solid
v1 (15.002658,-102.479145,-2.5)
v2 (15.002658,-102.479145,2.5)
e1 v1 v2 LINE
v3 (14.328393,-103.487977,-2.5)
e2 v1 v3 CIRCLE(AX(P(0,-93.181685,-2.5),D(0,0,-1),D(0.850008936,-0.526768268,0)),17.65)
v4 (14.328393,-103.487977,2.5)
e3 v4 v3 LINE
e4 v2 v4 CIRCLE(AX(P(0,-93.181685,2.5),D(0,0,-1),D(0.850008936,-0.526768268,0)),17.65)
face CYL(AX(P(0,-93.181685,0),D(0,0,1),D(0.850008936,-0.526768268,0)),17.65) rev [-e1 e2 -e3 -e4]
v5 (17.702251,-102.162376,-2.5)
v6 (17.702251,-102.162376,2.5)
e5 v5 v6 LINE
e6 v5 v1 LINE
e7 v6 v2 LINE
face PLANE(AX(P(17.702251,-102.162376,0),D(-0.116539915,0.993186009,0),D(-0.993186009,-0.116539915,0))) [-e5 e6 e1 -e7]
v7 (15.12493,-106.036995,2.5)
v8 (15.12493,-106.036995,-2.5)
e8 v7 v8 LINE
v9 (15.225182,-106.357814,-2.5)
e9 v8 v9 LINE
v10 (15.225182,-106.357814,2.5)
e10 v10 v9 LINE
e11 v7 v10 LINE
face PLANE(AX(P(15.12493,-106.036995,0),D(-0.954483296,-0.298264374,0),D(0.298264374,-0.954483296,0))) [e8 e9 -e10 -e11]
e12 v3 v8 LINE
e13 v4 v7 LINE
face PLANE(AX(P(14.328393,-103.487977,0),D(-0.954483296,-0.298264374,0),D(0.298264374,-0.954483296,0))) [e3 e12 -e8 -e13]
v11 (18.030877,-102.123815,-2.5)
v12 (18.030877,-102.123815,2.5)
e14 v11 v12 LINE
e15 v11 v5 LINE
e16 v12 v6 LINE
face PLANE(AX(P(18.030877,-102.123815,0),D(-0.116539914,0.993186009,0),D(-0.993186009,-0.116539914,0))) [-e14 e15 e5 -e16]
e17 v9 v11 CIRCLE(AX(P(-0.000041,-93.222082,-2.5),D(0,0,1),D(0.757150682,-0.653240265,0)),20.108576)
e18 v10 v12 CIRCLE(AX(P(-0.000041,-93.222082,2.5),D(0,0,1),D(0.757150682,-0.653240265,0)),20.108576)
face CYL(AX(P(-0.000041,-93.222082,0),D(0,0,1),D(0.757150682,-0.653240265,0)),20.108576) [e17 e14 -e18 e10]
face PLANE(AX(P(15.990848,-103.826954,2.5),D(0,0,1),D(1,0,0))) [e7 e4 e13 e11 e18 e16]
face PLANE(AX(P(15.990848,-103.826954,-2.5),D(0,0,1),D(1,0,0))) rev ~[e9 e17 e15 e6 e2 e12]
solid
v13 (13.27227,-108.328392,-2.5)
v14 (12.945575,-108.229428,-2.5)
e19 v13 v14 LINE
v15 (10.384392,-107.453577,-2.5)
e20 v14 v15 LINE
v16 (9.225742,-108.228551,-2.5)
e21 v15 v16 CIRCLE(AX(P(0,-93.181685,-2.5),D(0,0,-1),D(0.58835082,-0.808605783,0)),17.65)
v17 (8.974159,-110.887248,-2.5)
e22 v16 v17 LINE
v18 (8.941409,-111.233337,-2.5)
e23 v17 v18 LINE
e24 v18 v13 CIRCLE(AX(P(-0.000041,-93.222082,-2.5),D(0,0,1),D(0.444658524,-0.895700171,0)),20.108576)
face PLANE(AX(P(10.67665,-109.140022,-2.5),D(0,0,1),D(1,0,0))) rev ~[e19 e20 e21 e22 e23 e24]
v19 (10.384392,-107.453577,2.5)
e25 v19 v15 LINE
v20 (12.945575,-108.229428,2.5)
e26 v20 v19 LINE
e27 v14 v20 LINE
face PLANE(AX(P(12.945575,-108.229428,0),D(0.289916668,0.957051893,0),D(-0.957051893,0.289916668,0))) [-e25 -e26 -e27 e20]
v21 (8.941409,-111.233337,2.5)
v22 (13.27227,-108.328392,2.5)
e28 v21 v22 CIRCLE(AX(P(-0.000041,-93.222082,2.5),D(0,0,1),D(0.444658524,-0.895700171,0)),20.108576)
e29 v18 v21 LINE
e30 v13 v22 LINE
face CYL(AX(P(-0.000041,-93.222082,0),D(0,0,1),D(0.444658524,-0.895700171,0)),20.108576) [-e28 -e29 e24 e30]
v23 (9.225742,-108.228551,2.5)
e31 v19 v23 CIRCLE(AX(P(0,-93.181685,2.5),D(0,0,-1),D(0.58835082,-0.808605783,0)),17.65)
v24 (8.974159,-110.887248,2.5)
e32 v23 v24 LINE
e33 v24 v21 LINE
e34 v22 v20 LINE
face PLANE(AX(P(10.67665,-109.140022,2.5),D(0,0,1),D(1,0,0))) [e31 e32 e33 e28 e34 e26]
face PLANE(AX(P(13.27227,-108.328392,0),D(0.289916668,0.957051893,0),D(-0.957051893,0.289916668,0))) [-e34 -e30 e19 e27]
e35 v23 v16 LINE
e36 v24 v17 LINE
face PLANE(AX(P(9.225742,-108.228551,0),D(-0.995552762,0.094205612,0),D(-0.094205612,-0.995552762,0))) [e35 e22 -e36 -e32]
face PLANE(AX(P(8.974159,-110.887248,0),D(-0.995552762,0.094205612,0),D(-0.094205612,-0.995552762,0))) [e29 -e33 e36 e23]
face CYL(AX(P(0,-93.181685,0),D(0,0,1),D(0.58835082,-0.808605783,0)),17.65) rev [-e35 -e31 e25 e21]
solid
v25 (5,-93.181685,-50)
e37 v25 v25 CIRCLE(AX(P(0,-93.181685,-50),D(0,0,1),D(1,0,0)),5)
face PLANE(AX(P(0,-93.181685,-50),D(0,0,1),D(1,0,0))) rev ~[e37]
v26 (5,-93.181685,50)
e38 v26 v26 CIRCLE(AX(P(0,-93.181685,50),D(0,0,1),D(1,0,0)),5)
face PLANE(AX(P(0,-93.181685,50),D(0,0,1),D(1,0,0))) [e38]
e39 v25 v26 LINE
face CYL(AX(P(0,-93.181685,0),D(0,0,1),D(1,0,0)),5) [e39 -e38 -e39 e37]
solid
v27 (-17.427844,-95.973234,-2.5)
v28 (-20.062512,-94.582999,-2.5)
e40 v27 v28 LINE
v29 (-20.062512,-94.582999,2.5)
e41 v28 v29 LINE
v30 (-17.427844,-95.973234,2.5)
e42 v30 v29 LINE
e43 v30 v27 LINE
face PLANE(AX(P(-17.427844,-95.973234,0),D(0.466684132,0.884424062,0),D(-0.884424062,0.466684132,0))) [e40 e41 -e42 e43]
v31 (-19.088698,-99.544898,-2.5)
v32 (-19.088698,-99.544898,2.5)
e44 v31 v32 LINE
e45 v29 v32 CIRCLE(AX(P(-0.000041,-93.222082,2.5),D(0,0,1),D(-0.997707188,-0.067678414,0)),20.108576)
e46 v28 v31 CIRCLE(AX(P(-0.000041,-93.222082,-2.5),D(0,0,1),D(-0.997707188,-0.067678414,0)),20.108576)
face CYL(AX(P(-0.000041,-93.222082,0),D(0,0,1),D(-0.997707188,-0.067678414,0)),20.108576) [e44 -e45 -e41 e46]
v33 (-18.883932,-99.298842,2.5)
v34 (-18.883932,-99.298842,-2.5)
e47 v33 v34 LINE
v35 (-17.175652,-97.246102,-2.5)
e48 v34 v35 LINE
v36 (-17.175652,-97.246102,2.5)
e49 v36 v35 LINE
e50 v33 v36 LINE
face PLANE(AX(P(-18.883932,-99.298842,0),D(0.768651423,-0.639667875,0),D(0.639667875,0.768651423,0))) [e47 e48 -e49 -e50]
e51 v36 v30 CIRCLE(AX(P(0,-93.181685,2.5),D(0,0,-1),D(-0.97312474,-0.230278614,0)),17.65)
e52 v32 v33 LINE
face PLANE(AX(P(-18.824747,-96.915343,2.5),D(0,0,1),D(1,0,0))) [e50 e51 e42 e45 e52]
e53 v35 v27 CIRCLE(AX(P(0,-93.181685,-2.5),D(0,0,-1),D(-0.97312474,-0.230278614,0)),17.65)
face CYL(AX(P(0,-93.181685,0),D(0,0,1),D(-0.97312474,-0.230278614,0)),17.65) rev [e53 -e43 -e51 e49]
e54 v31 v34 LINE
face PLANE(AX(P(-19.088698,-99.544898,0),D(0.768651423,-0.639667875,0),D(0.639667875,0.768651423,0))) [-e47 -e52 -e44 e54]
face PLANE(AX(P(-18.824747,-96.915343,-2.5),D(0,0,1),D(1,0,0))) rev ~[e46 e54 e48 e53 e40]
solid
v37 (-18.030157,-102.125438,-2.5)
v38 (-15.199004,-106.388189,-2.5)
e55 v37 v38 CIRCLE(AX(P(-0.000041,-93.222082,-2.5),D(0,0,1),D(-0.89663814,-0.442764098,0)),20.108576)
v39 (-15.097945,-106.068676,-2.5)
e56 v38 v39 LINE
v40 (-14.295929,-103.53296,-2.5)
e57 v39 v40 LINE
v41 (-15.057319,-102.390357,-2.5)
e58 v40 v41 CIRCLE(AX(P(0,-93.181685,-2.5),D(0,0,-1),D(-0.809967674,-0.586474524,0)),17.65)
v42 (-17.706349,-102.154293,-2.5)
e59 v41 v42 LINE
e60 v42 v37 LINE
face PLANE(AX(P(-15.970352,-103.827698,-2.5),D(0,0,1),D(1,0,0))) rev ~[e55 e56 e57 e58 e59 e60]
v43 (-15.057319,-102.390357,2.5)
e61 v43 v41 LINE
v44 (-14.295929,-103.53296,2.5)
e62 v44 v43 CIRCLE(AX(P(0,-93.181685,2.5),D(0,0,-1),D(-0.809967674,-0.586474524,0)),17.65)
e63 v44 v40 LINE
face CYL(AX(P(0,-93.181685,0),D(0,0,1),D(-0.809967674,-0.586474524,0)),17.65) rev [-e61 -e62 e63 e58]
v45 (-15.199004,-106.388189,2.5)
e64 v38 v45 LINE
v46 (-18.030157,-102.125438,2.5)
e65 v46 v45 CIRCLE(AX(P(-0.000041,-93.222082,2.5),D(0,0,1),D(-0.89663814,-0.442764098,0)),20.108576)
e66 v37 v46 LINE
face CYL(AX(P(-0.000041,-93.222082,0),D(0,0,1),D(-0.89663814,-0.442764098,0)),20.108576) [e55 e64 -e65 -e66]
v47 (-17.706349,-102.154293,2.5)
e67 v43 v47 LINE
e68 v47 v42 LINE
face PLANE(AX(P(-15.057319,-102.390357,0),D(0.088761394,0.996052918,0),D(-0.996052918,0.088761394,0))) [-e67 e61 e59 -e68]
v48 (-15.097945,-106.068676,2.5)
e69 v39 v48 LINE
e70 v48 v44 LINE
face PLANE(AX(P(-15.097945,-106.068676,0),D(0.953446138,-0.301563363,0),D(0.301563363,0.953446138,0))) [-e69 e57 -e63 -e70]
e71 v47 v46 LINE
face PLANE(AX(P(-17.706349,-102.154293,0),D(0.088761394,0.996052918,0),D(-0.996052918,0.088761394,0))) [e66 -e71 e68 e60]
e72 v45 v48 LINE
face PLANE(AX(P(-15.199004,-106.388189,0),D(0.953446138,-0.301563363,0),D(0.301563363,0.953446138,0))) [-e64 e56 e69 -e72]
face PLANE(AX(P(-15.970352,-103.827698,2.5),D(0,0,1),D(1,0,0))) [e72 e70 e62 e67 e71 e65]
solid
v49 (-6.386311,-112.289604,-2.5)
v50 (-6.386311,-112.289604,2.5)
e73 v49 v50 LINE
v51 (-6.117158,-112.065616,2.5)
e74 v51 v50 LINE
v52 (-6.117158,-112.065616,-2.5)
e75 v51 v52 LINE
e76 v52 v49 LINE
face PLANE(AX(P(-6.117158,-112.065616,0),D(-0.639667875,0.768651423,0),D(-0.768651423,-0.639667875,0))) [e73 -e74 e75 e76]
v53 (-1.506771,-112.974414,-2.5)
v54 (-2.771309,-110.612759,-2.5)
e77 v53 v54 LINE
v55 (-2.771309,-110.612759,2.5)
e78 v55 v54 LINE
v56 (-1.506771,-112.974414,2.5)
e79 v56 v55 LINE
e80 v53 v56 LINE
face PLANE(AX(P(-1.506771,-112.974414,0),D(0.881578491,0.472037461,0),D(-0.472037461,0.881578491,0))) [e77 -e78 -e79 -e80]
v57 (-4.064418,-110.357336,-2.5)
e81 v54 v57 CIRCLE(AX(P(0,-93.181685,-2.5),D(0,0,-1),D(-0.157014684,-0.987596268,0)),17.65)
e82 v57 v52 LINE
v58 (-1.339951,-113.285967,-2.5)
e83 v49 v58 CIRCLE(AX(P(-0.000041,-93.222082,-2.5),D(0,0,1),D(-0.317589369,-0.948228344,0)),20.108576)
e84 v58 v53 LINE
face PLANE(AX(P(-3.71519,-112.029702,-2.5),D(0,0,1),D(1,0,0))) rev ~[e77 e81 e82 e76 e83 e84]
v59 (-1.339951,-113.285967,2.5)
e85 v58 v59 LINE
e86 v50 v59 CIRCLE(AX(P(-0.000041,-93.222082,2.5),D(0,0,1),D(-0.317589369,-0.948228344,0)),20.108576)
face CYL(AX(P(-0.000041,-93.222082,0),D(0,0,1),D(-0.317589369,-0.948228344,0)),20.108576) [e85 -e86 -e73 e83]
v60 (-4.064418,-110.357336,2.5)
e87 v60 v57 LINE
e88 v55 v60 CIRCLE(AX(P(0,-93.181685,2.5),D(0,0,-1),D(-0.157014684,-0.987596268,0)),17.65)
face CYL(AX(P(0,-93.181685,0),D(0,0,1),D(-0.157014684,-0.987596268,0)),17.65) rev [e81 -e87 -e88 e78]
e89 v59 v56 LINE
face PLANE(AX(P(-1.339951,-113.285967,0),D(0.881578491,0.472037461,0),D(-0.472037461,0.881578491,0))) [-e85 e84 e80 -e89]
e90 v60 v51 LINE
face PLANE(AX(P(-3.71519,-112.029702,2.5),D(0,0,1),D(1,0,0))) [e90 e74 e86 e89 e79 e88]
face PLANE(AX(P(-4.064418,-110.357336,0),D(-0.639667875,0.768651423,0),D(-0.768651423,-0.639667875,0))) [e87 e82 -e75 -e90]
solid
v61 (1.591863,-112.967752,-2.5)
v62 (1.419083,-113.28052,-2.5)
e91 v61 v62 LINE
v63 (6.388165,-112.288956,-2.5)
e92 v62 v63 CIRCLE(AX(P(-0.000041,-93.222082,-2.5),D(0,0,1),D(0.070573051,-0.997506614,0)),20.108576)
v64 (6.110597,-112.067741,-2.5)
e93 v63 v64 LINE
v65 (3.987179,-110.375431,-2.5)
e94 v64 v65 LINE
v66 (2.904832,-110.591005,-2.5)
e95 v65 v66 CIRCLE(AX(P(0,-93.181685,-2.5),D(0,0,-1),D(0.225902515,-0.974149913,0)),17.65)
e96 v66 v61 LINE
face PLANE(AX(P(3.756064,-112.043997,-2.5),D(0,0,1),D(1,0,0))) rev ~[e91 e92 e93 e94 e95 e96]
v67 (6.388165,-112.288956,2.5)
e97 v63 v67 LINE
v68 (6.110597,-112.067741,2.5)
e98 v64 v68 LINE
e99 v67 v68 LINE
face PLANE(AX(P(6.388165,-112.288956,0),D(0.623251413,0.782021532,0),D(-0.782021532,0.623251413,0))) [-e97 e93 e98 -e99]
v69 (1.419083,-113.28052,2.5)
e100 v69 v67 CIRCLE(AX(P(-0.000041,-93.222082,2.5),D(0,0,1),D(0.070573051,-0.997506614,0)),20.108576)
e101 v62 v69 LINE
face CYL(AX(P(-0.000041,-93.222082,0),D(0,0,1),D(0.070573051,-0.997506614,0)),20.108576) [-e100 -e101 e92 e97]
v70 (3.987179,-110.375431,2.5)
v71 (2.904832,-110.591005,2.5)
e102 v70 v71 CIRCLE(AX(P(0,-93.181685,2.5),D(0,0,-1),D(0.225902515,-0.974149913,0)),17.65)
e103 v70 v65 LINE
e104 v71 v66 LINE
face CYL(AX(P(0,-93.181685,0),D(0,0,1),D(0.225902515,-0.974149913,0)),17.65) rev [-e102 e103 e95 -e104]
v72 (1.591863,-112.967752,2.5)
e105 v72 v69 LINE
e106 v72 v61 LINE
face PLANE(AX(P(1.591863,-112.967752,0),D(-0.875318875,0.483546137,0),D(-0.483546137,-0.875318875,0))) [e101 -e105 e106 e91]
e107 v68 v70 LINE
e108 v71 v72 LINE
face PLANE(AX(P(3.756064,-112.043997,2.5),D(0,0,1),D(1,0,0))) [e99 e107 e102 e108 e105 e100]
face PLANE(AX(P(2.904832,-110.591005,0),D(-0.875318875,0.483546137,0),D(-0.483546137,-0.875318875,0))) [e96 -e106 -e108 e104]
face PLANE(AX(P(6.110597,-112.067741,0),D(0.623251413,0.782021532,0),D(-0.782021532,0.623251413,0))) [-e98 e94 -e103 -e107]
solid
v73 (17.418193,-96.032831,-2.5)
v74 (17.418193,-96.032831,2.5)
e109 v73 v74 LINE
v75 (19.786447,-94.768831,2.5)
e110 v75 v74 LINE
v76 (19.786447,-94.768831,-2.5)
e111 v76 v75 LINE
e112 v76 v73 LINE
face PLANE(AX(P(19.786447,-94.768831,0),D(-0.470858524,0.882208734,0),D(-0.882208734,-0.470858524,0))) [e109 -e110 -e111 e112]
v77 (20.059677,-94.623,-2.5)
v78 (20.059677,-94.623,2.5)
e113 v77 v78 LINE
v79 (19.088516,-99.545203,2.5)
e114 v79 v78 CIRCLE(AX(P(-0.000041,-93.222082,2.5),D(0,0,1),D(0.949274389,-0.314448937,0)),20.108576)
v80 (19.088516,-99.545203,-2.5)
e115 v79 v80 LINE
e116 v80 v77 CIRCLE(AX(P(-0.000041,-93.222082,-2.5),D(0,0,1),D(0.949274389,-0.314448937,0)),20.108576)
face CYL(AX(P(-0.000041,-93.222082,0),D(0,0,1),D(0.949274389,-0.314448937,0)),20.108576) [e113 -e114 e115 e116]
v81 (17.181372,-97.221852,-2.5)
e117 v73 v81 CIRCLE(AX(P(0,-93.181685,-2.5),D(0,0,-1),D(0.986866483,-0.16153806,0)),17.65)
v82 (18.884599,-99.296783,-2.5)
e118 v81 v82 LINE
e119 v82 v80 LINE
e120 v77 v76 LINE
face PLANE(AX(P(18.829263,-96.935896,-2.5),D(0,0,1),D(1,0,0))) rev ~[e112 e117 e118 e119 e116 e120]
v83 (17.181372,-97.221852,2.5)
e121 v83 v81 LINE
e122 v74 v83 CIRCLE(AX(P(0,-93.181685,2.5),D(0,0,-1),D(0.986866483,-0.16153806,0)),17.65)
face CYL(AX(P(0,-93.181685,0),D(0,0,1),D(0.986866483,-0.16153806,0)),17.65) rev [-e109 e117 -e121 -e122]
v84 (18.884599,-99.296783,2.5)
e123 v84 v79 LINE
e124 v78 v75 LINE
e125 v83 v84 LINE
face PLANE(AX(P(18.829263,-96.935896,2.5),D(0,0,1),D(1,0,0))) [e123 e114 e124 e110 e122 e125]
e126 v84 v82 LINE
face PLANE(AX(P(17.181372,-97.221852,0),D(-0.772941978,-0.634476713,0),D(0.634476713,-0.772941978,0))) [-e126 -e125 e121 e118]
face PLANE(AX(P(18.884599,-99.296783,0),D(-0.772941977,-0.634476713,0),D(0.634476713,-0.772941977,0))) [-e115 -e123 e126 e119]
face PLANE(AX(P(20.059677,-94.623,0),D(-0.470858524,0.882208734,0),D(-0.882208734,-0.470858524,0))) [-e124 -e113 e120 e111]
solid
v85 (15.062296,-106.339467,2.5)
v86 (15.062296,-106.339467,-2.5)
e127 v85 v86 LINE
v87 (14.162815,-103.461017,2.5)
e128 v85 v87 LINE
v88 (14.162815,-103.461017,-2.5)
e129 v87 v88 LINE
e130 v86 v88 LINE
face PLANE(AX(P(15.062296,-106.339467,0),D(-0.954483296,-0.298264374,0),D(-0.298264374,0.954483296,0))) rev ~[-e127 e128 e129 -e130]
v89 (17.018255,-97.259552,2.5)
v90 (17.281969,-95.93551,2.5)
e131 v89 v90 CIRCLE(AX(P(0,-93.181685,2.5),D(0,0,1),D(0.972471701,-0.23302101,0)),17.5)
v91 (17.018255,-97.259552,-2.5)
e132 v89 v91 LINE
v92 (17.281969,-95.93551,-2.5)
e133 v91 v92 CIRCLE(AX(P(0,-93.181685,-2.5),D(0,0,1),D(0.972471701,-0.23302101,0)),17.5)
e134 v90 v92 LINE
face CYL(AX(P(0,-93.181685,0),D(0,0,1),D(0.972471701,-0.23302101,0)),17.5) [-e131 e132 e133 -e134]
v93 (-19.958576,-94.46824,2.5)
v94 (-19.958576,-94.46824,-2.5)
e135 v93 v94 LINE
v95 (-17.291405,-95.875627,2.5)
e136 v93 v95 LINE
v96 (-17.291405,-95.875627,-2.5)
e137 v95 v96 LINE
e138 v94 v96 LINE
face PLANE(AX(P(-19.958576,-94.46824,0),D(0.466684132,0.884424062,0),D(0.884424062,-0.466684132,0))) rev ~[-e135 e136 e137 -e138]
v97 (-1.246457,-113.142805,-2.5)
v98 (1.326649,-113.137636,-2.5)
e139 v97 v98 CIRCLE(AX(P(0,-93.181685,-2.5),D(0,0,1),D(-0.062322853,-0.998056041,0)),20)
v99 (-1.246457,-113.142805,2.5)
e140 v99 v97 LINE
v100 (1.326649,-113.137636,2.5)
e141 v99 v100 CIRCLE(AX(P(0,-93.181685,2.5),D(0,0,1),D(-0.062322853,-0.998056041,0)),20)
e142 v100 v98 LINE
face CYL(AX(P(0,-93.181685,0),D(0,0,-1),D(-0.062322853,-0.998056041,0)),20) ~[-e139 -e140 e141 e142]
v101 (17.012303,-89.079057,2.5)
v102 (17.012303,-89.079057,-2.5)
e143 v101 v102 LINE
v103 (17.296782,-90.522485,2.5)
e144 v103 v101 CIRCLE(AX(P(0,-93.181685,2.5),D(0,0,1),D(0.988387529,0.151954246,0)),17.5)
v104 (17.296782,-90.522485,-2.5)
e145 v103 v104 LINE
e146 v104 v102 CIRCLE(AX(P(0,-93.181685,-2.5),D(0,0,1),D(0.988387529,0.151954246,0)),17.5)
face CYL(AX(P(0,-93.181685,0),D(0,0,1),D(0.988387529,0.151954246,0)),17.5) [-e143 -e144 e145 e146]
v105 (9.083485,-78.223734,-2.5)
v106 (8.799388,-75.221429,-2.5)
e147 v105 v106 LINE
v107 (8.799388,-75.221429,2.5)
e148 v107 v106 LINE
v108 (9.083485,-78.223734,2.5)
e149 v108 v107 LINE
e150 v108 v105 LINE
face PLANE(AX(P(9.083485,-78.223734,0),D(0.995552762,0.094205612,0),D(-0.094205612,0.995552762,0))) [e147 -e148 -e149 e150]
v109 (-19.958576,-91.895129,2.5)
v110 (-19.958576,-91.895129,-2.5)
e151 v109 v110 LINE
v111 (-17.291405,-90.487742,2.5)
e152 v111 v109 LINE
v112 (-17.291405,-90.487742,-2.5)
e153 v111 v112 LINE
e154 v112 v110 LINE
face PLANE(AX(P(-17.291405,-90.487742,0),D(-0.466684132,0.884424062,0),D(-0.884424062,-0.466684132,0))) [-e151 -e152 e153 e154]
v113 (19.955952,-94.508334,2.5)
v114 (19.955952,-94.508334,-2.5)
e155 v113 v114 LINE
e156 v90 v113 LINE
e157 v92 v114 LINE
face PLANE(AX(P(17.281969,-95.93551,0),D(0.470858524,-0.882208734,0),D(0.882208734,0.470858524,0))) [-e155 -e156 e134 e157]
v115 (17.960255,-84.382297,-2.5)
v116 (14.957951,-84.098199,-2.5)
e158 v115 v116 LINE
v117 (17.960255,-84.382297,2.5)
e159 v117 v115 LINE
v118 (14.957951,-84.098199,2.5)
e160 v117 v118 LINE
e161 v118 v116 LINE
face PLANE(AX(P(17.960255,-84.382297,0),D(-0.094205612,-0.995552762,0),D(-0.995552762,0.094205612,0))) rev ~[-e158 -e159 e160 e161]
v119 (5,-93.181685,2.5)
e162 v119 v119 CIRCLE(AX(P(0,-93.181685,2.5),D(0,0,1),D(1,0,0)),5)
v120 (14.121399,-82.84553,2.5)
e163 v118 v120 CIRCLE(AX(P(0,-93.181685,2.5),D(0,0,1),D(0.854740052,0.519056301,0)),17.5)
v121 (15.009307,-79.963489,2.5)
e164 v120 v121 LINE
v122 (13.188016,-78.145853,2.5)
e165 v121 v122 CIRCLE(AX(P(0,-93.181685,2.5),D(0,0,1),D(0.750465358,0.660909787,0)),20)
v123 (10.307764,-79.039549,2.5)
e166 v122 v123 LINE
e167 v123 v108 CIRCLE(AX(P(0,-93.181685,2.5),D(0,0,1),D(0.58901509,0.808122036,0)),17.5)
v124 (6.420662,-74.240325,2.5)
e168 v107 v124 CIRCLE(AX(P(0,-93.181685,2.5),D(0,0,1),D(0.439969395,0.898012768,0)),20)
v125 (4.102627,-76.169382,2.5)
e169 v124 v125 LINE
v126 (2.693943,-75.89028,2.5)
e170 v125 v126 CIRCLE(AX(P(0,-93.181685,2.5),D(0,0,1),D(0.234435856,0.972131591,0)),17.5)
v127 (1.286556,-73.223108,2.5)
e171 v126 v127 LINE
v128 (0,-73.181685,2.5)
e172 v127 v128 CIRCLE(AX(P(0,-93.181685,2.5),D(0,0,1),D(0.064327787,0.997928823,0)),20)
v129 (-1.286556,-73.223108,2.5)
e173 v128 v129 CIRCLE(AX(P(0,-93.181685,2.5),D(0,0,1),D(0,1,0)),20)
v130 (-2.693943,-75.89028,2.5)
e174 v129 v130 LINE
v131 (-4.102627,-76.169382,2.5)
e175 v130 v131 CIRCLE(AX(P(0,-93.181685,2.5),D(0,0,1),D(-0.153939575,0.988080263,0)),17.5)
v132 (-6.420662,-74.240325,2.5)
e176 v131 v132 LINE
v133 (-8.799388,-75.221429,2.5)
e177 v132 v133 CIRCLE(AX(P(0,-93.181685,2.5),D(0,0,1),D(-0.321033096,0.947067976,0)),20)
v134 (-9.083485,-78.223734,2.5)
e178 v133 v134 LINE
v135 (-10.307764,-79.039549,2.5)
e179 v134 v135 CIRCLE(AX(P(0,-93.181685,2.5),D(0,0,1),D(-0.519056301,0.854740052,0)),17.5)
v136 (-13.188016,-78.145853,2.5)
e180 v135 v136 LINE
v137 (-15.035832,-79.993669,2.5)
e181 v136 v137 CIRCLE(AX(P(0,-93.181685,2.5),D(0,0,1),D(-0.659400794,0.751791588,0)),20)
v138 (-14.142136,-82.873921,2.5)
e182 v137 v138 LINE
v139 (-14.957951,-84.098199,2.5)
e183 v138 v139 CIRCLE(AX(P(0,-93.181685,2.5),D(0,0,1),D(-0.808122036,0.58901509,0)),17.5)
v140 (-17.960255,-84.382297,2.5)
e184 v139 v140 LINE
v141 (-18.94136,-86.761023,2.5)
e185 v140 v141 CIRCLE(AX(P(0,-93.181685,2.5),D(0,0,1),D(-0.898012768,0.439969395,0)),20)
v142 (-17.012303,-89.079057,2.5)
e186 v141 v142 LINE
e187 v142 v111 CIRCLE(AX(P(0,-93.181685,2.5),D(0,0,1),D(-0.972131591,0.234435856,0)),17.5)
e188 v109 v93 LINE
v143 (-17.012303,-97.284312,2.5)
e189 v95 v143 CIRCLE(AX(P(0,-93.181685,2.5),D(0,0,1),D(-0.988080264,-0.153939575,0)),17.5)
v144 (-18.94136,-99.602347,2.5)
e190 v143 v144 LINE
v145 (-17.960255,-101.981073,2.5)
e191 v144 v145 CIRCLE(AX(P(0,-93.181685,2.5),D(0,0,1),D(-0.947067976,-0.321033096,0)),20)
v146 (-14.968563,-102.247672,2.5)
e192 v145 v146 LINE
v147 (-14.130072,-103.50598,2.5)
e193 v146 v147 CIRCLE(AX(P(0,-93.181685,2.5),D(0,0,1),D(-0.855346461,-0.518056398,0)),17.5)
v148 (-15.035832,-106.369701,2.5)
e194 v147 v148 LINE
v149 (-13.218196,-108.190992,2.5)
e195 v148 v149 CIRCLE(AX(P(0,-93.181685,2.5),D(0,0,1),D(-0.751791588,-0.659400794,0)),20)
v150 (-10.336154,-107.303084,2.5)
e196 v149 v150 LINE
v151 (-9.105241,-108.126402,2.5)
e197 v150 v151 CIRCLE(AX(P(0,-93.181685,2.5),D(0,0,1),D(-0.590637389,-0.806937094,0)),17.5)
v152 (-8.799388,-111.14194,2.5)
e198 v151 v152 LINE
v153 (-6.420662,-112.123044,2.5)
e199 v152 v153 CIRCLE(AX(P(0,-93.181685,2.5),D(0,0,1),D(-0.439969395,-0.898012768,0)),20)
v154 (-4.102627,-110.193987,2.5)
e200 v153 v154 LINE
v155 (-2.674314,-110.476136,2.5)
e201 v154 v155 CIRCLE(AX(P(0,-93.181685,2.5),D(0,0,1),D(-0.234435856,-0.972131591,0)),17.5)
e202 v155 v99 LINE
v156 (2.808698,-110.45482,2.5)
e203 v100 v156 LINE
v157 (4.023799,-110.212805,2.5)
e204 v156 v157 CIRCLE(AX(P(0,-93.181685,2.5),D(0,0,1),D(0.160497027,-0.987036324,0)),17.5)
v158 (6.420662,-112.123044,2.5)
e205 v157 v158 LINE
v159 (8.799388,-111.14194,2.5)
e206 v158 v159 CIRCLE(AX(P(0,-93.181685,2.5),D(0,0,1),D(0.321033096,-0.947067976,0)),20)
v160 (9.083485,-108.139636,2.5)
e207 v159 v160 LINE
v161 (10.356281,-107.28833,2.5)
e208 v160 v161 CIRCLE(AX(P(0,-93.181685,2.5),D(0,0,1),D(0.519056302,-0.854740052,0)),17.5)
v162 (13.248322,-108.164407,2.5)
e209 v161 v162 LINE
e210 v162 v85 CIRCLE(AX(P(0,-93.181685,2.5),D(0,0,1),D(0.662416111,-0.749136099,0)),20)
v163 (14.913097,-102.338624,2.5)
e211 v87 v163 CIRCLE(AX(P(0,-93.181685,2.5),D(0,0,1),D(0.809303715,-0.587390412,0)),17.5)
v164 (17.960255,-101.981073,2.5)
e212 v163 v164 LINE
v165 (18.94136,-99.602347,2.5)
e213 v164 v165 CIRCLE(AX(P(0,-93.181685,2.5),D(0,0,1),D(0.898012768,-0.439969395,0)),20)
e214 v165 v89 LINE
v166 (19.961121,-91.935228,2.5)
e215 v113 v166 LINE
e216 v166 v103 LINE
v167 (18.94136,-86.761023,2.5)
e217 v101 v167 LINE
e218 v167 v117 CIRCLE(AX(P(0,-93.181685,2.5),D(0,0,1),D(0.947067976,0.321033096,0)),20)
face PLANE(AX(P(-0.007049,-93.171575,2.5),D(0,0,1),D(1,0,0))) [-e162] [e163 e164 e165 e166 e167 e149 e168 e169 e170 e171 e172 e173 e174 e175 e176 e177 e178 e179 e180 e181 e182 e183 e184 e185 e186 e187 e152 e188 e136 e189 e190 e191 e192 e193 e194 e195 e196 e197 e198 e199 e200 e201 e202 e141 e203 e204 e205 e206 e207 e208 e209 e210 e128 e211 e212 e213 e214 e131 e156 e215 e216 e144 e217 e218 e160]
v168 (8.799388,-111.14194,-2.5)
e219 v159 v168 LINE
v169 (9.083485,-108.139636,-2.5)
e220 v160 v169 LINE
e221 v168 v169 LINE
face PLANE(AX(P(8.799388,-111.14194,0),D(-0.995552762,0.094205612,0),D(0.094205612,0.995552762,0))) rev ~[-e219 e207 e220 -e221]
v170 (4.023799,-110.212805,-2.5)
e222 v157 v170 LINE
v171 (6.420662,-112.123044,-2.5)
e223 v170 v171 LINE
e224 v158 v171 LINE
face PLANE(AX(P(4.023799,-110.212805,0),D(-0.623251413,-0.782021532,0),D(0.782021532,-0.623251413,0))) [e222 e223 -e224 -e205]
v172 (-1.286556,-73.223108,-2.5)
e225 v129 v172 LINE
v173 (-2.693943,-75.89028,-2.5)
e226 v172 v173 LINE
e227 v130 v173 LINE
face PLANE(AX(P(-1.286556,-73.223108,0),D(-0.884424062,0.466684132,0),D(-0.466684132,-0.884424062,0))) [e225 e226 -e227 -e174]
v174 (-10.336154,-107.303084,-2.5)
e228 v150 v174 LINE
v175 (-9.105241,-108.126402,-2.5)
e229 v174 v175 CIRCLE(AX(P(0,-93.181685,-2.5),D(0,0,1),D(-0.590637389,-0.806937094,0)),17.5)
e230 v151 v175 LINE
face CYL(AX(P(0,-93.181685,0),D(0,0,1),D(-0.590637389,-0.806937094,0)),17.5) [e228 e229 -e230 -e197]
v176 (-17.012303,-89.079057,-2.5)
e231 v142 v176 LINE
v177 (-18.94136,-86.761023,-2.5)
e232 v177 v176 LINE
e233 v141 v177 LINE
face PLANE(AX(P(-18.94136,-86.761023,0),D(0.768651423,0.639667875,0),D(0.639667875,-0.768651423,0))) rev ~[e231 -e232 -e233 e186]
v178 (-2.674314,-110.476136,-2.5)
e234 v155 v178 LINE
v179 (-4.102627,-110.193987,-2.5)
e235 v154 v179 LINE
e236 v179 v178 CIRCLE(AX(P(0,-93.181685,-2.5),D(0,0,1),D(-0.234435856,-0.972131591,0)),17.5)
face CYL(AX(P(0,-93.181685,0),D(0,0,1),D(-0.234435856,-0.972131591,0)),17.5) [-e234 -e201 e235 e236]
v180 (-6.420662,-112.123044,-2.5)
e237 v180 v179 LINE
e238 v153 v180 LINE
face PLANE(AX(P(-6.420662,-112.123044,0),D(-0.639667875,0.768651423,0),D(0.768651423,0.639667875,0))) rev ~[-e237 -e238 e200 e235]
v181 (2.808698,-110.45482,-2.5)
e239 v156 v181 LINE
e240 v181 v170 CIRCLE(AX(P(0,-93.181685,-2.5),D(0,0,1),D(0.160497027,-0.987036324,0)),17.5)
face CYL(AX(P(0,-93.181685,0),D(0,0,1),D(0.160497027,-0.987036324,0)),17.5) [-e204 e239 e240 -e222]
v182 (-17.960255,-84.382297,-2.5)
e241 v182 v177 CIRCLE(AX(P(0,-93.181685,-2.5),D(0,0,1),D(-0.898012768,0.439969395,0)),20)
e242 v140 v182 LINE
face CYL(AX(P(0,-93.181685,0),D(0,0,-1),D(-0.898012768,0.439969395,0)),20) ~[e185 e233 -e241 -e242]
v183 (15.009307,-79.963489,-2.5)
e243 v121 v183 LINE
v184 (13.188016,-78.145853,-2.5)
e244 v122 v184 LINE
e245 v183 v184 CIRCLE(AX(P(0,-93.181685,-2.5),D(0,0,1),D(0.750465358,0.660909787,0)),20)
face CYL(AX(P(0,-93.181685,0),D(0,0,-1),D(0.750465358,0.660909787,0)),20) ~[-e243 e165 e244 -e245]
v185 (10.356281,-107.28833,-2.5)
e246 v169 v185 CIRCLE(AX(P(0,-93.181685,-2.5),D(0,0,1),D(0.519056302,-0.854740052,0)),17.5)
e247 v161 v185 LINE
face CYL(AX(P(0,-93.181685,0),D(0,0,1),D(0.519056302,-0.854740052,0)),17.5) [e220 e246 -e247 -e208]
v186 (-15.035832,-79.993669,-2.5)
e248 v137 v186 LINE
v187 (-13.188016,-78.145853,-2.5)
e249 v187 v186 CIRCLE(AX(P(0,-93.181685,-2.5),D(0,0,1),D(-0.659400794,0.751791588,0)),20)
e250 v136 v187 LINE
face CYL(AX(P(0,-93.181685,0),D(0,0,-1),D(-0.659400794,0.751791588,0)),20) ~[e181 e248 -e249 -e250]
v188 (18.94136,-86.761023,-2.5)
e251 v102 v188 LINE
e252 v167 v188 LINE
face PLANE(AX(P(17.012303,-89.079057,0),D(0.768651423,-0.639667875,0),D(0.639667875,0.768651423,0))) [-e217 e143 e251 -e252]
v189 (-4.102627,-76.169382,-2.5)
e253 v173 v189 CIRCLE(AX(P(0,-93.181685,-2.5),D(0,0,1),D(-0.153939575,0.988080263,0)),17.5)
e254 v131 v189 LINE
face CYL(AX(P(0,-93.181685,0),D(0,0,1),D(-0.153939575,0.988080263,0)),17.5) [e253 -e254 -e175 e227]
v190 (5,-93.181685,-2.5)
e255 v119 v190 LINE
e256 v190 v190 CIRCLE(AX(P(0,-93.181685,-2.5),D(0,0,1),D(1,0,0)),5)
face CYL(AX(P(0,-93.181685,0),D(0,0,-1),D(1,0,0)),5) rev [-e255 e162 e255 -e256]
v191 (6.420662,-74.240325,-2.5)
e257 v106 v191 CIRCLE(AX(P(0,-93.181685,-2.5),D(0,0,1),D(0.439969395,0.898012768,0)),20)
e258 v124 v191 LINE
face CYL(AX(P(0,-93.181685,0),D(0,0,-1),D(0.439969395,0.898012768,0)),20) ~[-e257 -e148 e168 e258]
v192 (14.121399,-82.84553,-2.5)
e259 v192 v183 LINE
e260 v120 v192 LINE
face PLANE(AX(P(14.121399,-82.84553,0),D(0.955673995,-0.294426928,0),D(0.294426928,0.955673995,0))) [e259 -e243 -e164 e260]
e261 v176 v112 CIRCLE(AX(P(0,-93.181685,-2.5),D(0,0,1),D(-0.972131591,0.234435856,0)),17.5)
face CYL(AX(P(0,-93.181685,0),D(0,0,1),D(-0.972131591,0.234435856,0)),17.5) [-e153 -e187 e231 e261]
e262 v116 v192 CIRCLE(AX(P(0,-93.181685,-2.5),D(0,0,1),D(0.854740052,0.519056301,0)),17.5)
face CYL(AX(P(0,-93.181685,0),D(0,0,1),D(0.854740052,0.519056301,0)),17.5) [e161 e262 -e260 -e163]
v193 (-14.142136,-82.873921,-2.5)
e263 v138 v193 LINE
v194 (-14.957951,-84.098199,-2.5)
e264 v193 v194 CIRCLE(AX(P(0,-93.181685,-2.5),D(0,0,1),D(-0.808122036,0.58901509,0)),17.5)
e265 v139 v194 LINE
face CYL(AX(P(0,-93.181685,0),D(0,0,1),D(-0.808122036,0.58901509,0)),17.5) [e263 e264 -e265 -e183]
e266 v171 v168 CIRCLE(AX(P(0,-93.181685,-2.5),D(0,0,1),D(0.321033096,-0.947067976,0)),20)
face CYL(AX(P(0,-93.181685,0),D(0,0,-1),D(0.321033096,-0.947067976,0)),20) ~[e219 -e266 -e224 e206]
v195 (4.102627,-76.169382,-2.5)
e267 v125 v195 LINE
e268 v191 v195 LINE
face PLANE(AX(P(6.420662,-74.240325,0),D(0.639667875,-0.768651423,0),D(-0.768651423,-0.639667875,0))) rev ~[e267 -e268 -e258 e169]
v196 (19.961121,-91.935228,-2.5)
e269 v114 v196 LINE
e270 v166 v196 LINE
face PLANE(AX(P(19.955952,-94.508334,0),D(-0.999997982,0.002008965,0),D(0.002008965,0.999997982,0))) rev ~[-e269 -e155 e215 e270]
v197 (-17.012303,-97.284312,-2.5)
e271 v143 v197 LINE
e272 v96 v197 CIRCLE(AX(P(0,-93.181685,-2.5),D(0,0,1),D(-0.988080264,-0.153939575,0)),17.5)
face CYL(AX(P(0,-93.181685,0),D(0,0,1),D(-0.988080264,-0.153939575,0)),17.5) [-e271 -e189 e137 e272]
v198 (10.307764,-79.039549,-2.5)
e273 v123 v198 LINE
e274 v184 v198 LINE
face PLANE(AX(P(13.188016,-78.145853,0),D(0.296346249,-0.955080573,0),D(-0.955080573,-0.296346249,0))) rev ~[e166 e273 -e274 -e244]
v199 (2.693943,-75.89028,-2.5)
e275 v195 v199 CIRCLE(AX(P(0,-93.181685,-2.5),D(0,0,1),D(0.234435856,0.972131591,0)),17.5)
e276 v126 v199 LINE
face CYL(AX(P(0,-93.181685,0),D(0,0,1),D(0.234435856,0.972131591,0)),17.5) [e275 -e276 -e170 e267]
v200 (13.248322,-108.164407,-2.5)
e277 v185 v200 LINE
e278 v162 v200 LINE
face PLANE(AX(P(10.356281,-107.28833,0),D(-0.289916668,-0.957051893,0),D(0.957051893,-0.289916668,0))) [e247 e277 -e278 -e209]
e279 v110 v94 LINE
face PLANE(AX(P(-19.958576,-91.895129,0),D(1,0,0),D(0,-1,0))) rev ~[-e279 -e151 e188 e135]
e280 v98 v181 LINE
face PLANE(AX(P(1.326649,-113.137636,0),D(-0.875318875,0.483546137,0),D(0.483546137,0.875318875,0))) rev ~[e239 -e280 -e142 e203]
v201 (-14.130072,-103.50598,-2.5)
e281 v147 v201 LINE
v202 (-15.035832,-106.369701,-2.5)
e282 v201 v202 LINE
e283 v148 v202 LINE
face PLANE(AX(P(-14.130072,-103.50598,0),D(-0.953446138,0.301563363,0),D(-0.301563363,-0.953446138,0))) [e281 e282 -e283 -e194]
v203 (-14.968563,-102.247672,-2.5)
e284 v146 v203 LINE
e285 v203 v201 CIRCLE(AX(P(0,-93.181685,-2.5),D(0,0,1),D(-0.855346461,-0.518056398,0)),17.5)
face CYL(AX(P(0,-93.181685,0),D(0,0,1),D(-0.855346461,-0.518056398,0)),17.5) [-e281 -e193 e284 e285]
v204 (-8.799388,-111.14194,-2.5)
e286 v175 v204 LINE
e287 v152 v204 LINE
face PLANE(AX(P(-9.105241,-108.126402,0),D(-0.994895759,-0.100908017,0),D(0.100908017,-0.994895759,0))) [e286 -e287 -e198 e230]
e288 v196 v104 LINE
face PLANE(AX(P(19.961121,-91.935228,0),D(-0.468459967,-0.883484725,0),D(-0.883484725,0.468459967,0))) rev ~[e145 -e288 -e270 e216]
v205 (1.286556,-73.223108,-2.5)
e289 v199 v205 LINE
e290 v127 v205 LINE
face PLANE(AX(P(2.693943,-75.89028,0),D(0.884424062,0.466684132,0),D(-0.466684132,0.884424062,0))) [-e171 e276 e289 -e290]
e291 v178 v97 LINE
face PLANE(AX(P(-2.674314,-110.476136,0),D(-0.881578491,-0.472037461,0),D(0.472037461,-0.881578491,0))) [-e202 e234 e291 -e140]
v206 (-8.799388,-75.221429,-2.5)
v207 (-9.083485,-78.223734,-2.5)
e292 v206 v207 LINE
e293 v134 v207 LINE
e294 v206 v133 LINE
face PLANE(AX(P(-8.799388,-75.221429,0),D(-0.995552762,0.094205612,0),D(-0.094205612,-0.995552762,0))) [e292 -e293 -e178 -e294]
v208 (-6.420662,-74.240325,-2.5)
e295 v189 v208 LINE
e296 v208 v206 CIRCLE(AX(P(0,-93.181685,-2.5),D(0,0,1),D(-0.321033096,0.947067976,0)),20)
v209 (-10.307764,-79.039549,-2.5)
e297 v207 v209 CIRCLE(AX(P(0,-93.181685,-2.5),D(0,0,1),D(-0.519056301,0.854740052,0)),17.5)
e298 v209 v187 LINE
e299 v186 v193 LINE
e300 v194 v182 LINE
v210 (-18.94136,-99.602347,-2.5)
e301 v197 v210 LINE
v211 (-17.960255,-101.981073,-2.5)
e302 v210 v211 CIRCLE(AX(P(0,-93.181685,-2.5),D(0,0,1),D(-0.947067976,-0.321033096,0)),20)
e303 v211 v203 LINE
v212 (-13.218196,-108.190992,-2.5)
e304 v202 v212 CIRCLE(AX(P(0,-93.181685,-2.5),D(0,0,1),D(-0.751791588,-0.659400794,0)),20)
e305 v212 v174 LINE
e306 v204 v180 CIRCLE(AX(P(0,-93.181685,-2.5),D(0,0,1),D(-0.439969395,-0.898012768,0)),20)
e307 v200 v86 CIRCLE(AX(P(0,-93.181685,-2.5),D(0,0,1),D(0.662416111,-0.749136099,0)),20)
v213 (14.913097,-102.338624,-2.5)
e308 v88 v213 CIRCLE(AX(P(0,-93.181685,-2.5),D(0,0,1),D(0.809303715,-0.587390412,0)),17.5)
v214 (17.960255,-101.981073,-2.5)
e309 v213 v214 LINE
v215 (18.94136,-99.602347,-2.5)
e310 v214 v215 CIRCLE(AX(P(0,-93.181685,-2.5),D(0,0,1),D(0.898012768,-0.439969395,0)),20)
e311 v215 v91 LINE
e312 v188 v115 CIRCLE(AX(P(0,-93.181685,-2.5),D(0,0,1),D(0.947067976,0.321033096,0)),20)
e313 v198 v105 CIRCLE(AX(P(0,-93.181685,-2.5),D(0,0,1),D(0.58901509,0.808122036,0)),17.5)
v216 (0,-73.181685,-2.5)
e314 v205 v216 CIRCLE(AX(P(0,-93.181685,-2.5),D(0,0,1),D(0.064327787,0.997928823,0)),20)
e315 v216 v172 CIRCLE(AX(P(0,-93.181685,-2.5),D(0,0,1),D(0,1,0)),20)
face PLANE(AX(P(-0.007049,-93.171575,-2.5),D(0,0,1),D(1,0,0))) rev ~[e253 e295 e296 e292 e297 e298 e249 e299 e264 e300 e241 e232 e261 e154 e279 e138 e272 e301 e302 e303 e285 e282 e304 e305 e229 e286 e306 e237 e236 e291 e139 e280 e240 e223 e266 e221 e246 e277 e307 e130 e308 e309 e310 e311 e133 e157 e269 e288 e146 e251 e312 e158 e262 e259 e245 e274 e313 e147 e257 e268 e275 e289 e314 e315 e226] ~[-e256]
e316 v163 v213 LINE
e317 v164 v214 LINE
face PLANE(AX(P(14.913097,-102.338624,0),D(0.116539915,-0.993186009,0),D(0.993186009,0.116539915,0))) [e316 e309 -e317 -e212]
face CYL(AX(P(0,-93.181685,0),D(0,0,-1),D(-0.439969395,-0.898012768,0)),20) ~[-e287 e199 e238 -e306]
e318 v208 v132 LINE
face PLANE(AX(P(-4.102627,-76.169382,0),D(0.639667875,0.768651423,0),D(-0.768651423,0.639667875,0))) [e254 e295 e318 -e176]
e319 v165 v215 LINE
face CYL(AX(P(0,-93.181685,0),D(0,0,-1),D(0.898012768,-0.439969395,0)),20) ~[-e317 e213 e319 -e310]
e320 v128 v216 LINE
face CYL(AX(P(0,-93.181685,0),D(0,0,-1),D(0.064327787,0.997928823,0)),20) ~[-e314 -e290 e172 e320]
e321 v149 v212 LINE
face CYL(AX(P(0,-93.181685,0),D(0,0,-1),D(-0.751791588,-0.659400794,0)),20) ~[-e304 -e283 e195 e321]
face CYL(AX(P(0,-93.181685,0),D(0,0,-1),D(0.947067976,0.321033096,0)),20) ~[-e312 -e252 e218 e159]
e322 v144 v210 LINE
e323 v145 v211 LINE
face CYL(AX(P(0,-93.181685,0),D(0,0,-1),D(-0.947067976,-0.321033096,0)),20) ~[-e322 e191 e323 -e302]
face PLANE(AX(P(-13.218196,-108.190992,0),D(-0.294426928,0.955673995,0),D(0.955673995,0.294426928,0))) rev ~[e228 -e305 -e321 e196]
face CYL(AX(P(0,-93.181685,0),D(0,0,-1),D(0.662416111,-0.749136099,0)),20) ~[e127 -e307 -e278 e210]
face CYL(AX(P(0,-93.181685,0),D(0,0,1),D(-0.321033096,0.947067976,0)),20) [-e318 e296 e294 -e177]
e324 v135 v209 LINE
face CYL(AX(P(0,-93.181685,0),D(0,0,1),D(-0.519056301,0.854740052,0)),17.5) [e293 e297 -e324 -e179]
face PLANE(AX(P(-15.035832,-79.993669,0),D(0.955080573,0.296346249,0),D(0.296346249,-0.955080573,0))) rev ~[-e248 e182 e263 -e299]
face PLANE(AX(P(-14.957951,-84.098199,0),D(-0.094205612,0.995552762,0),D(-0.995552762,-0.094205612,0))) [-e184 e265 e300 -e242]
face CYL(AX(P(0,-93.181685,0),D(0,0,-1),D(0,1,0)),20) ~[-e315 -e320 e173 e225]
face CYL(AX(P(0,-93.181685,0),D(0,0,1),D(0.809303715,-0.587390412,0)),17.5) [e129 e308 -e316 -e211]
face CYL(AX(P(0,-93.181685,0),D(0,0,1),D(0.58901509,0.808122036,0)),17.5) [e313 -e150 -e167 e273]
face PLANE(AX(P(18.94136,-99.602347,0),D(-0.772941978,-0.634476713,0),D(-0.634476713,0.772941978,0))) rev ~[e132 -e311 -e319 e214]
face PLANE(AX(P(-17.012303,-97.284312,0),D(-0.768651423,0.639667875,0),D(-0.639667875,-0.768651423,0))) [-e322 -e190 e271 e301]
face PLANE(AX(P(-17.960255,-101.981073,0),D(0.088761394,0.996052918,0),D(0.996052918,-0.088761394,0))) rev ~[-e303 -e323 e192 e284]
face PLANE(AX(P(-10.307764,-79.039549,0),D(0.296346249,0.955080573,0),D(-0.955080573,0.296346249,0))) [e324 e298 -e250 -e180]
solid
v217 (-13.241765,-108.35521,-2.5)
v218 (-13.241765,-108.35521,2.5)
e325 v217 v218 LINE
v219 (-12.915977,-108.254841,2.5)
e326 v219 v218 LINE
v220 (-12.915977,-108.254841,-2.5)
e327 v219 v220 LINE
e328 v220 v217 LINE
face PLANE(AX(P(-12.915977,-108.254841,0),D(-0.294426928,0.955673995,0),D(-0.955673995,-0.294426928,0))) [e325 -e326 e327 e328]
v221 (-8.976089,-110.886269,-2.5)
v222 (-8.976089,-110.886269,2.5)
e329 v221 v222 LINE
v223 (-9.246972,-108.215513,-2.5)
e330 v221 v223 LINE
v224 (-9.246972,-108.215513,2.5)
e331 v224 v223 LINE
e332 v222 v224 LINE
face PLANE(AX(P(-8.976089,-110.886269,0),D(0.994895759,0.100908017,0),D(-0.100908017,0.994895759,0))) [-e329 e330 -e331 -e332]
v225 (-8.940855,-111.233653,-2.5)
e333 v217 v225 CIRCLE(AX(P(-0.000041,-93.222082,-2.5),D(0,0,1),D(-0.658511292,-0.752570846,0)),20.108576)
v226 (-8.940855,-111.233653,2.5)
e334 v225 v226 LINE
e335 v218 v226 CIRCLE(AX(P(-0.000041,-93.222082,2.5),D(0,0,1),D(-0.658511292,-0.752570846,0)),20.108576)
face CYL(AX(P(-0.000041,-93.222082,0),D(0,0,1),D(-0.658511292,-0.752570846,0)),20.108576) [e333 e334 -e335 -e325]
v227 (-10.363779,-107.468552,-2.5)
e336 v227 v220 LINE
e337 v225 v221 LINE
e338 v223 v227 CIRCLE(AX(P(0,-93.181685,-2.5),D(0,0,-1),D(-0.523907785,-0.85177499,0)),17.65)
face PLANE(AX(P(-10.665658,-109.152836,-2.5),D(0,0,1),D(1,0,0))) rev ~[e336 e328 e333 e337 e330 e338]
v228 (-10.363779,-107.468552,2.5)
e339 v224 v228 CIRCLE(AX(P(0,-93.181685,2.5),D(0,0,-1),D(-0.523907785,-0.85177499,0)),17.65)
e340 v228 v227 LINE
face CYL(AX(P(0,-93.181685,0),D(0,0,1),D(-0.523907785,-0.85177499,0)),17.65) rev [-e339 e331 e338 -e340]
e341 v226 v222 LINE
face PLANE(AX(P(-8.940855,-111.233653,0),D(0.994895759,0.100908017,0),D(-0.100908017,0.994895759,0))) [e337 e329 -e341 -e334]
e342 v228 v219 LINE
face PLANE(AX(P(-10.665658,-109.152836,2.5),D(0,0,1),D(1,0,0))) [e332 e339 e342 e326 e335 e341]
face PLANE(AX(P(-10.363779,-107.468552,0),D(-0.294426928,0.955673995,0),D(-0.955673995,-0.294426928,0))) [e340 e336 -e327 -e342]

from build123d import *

# Parameters (mm, degrees)
F0_R     = 5
F1_DEPTH = 50
F2_DEPTH = 2.5
F3_DEPTH = 2.5


# Not quite as in the source:
# - a feature names something its author has since deleted; it is built from what else it names
# - the program builds the solid bodies; features that only make, move or delete a surface that nothing else refers to are left out


with BuildPart() as f1:
    # F0 (on Top) → F1 (new body, symmetric)
    with BuildSketch(Plane.XY):
        with Locations((0, -93.1816846132)):
            Circle(F0_R)
    extrude(amount=F1_DEPTH, both=True)


with BuildPart() as f2:
    # F0 (on Top) → F2 (new body, symmetric)
    with BuildSketch(Plane.XY):
        with BuildLine():
            Line((-4.1026274762, -76.169381777), (-6.4206619181, -74.2403250914))
            ThreePointArc((-6.4206619181, -74.2403250914), (-7.6258193304, -74.6925829709), (-8.7993878999, -75.2214292535))
            Line((-8.7993878999, -75.2214292535), (-9.0834852771, -78.2237337101))
            ThreePointArc((-9.0834852771, -78.2237337101), (-9.7042014816, -78.6187702893), (-10.307764064, -79.0395489895))
            Line((-10.307764064, -79.0395489895), (-13.1880158888, -78.1458528465))
            ThreePointArc((-13.1880158888, -78.1458528465), (-14.1421356237, -79.0395489895), (-15.0358317667, -79.9936687244))
            Line((-15.0358317667, -79.9936687244), (-14.1421356237, -82.8739205492))
            ThreePointArc((-14.1421356237, -82.8739205492), (-14.5629143239, -83.4774831316), (-14.9579509031, -84.0981993361))
            Line((-14.9579509031, -84.0981993361), (-17.9602553597, -84.3822967133))
            ThreePointArc((-17.9602553597, -84.3822967133), (-18.4891016423, -85.5558652828), (-18.9413595218, -86.7610226951))
            Line((-18.9413595218, -86.7610226951), (-17.0123028362, -89.079057137))
            ThreePointArc((-17.0123028362, -89.079057137), (-17.1663095757, -89.7805354617), (-17.2914046111, -90.4877420425))
            Line((-17.2914046111, -90.4877420425), (-19.9585764606, -91.8951288747))
            Line((-19.9585764606, -91.8951288747), (-19.9585764606, -93.1816846132))
            Line((-19.9585764606, -93.1816846132), (-19.9585764606, -94.4682403517))
            Line((-19.9585764606, -94.4682403517), (-17.2914046111, -95.875627184))
            ThreePointArc((-17.2914046111, -95.875627184), (-17.1663095757, -96.5828337648), (-17.0123028362, -97.2843120894))
            Line((-17.0123028362, -97.2843120894), (-18.9413595218, -99.6023465313))
            ThreePointArc((-18.9413595218, -99.6023465313), (-18.4891016423, -100.8075039436), (-17.9602553597, -101.9810725131))
            Line((-17.9602553597, -101.9810725131), (-14.9685630672, -102.2476715812))
            ThreePointArc((-14.9685630672, -102.2476715812), (-14.5629143239, -102.8858860948), (-14.1300718682, -103.5059796981))
            Line((-14.1300718682, -103.5059796981), (-15.0358317667, -106.369700502))
            ThreePointArc((-15.0358317667, -106.369700502), (-14.1563340221, -107.3096075693), (-13.2181957315, -108.1909917793))
            Line((-13.2181957315, -108.1909917793), (-10.336154315, -107.3030837641))
            ThreePointArc((-10.336154315, -107.3030837641), (-9.7294103647, -107.727769102), (-9.1052409735, -108.1264023026))
            Line((-9.1052409735, -108.1264023026), (-8.7993878999, -111.141939973))
            ThreePointArc((-8.7993878999, -111.141939973), (-7.6258193304, -111.6707862556), (-6.4206619181, -112.123044135))
            Line((-6.4206619181, -112.123044135), (-4.1026274762, -110.1939874495))
            ThreePointArc((-4.1026274762, -110.1939874495), (-3.3914061607, -110.3499216879), (-2.6743139613, -110.4761358863))
            Line((-2.6743139613, -110.4761358863), (-1.2464570661, -113.142805443))
            ThreePointArc((-1.2464570661, -113.142805443), (0.0401792946, -113.1816442538), (1.3266492185, -113.1376361528))
            Line((1.3266492185, -113.1376361528), (2.8086979778, -110.4548202773))
            ThreePointArc((2.8086979778, -110.4548202773), (3.4183906996, -110.3445691326), (4.0237985116, -110.2128045276))
            Line((4.0237985116, -110.2128045276), (6.4206619181, -112.123044135))
            ThreePointArc((6.4206619181, -112.123044135), (7.6258193304, -111.6707862556), (8.7993878999, -111.141939973))
            Line((8.7993878999, -111.141939973), (9.0834852771, -108.1396355164))
            ThreePointArc((9.0834852771, -108.1396355164), (9.7291988524, -107.7279105736), (10.3562811803, -107.2883298599))
            Line((10.3562811803, -107.2883298599), (13.2483222263, -108.1644066019))
            ThreePointArc((13.2483222263, -108.1644066019), (14.184687954, -107.2811394838), (15.0622956837, -106.3394674332))
            Line((15.0622956837, -106.3394674332), (14.1628150198, -103.4610168248))
            ThreePointArc((14.1628150198, -103.4610168248), (14.5487834975, -102.9070585774), (14.9130966677, -102.3386244831))
            Line((14.9130966677, -102.3386244831), (17.9602553597, -101.9810725131))
            ThreePointArc((17.9602553597, -101.9810725131), (18.4891016423, -100.8075039436), (18.9413595218, -99.6023465313))
            Line((18.9413595218, -99.6023465313), (17.0182547654, -97.259552284))
            ThreePointArc((17.0182547654, -97.259552284), (17.1628845194, -96.6000753129), (17.2819687479, -95.9355103516))
            Line((17.2819687479, -95.9355103516), (19.9559515396, -94.5083338317))
            Line((19.9559515396, -94.5083338317), (19.9585361847, -93.2217806894))
            Line((19.9585361847, -93.2217806894), (19.9611208298, -91.9352275472))
            Line((19.9611208298, -91.9352275472), (17.2967817532, -90.5224853008))
            ThreePointArc((17.2967817532, -90.5224853008), (17.1697173115, -89.7977804415), (17.0123028362, -89.079057137))
            Line((17.0123028362, -89.079057137), (18.9413595218, -86.7610226951))
            ThreePointArc((18.9413595218, -86.7610226951), (18.4891016423, -85.5558652828), (17.9602553597, -84.3822967133))
            Line((17.9602553597, -84.3822967133), (14.9579509031, -84.0981993361))
            ThreePointArc((14.9579509031, -84.0981993361), (14.5531592728, -83.4628598293), (14.1213991508, -82.8455302983))
            Line((14.1213991508, -82.8455302983), (15.009307166, -79.9634888818))
            ThreePointArc((15.009307166, -79.9634888818), (14.1279229561, -79.0253505911), (13.1880158888, -78.1458528465))
            Line((13.1880158888, -78.1458528465), (10.307764064, -79.0395489895))
            ThreePointArc((10.307764064, -79.0395489895), (9.7042014816, -78.6187702893), (9.0834852771, -78.2237337101))
            Line((9.0834852771, -78.2237337101), (8.7993878999, -75.2214292535))
            ThreePointArc((8.7993878999, -75.2214292535), (7.6258193304, -74.6925829709), (6.4206619181, -74.2403250914))
            Line((6.4206619181, -74.2403250914), (4.1026274762, -76.169381777))
            ThreePointArc((4.1026274762, -76.169381777), (3.4011491515, -76.0153750375), (2.6939425707, -75.8902800021))
            Line((2.6939425707, -75.8902800021), (1.2865557385, -73.2231081527))
            ThreePointArc((1.2865557385, -73.2231081527), (0.6436112138, -73.1920431806), (0, -73.1816846132))
            ThreePointArc((0, -73.1816846132), (-0.6436112138, -73.1920431806), (-1.2865557385, -73.2231081527))
            Line((-1.2865557385, -73.2231081527), (-2.6939425707, -75.8902800021))
            ThreePointArc((-2.6939425707, -75.8902800021), (-3.4011491515, -76.0153750375), (-4.1026274762, -76.169381777))
        make_face()
        with Locations((0, -93.1816846132)):
            Circle(F0_R, mode=Mode.SUBTRACT)
    extrude(amount=F2_DEPTH, both=True)


with BuildPart() as f3:
    # F0 (on Top) → F3 (new body, symmetric)
    with BuildSketch(Plane.XY):
        with BuildLine():
            Line((-17.4278441118, -95.9732339822), (-20.0625118464, -94.5829985995))
            ThreePointArc((-20.0625118464, -94.5829985995), (-19.7321928289, -97.0946799783), (-19.0886980781, -99.5448980313))
            Line((-19.0886980781, -99.5448980313), (-18.8839318475, -99.2988424443))
            Line((-18.8839318475, -99.2988424443), (-17.1756516165, -97.2461021379))
            ThreePointArc((-17.1756516165, -97.2461021379), (-17.3134493239, -96.6119864622), (-17.4278441118, -95.9732339822))
        make_face()
    extrude(amount=F3_DEPTH, both=True)


with BuildPart() as f3b:
    # F0 (on Top) → F3, piece 2 (new body, symmetric)
    with BuildSketch(Plane.XY):
        with BuildLine():
            ThreePointArc((19.0885160571, -99.5452025325), (19.7282098357, -97.1145083808), (20.0596771358, -94.6230004803))
            Line((20.0596771358, -94.6230004803), (19.7864465315, -94.768831001))
            Line((19.7864465315, -94.768831001), (17.418193425, -96.0328313668))
            ThreePointArc((17.418193425, -96.0328313668), (17.3099949581, -96.6293758046), (17.1813720516, -97.2218522365))
            Line((17.1813720516, -97.2218522365), (18.8845987244, -99.2967832239))
            Line((18.8845987244, -99.2967832239), (19.0885160571, -99.5452025325))
        make_face()
    extrude(amount=F3_DEPTH, both=True)


with BuildPart() as f3c:
    # F0 (on Top) → F3, piece 3 (new body, symmetric)
    with BuildSketch(Plane.XY):
        with BuildLine():
            Line((8.9741585505, -110.8872480979), (8.941409351, -111.2333374159))
            ThreePointArc((8.941409351, -111.2333374159), (11.2014087876, -109.9218538699), (13.2722702295, -108.3283924071))
            Line((13.2722702295, -108.3283924071), (12.9455754835, -108.2294278128))
            Line((12.9455754835, -108.2294278128), (10.3843919739, -107.4535766859))
            ThreePointArc((10.3843919739, -107.4535766859), (9.8127203562, -107.8525066492), (9.2257415735, -108.2285511448))
            Line((9.2257415735, -108.2285511448), (8.9741585505, -110.8872480979))
        make_face()
    extrude(amount=F3_DEPTH, both=True)


with BuildPart() as f3d:
    # F0 (on Top) → F3, piece 4 (new body, symmetric)
    with BuildSketch(Plane.XY):
        with BuildLine():
            Line((1.5918630958, -112.9677522338), (1.4190830131, -113.2805200467))
            ThreePointArc((1.4190830131, -113.2805200467), (3.934981449, -112.9418804335), (6.3881653122, -112.2889557361))
            Line((6.3881653122, -112.2889557361), (6.110596669, -112.0677405368))
            Line((6.110596669, -112.0677405368), (3.9871793865, -110.375430585))
            ThreePointArc((3.9871793865, -110.375430585), (3.4476911913, -110.4916795713), (2.9048323458, -110.5910053651))
            Line((2.9048323458, -110.5910053651), (1.5918630958, -112.9677522338))
        make_face()
    extrude(amount=F3_DEPTH, both=True)


with BuildPart() as f3e:
    # F0 (on Top) → F3, piece 5 (new body, symmetric)
    with BuildSketch(Plane.XY):
        with BuildLine():
            ThreePointArc((15.225181808, -106.3578138581), (16.7622505287, -104.3297570431), (18.0308773002, -102.1238148835))
            Line((18.0308773002, -102.1238148835), (17.7022509045, -102.1623757288))
            Line((17.7022509045, -102.1623757288), (15.0026577234, -102.4791445477))
            ThreePointArc((15.0026577234, -102.4791445477), (14.6741973125, -102.9893567751), (14.3283927934, -103.487976864))
            Line((14.3283927934, -103.487976864), (15.1249297653, -106.0369947843))
            Line((15.1249297653, -106.0369947843), (15.225181808, -106.3578138581))
        make_face()
    extrude(amount=F3_DEPTH, both=True)


with BuildPart() as f3f:
    # F0 (on Top) → F3, piece 6 (new body, symmetric)
    with BuildSketch(Plane.XY):
        with BuildLine():
            Line((-6.1171577311, -112.0656164414), (-6.3863106942, -112.2896041931))
            ThreePointArc((-6.3863106942, -112.2896041931), (-3.8951209972, -112.9498086087), (-1.3399510633, -113.2859671804))
            Line((-1.3399510633, -113.2859671804), (-1.5067708222, -112.9744141291))
            Line((-1.5067708222, -112.9744141291), (-2.771309172, -110.6127587475))
            ThreePointArc((-2.771309172, -110.6127587475), (-3.4202485266, -110.497122812), (-4.0644175121, -110.3573362832))
            Line((-4.0644175121, -110.3573362832), (-6.1171577311, -112.0656164414))
        make_face()
    extrude(amount=F3_DEPTH, both=True)


with BuildPart() as f3g:
    # F0 (on Top) → F3, piece 7 (new body, symmetric)
    with BuildSketch(Plane.XY):
        with BuildLine():
            Line((-12.9159771829, -108.2548406666), (-13.2417652424, -108.355210435))
            ThreePointArc((-13.2417652424, -108.355210435), (-11.1842983703, -109.9333723769), (-8.9408554374, -111.2336526744))
            Line((-8.9408554374, -111.2336526744), (-8.9760890259, -110.8862694939))
            Line((-8.9760890259, -110.8862694939), (-9.2469724028, -108.2155131802))
            ThreePointArc((-9.2469724028, -108.2155131802), (-9.8124861535, -107.8526632952), (-10.363779415, -107.4685518779))
            Line((-10.363779415, -107.4685518779), (-12.9159771829, -108.2548406666))
        make_face()
    extrude(amount=F3_DEPTH, both=True)


with BuildPart() as f3h:
    # F0 (on Top) → F3, piece 8 (new body, symmetric)
    with BuildSketch(Plane.XY):
        with BuildLine():
            Line((-17.7063489474, -102.1542933171), (-18.0301571677, -102.1254377527))
            ThreePointArc((-18.0301571677, -102.1254377527), (-16.7507329053, -104.3472406327), (-15.1990035025, -106.3881890254))
            Line((-15.1990035025, -106.3881890254), (-15.0979454061, -106.0686759034))
            Line((-15.0979454061, -106.0686759034), (-14.2959294395, -103.5329599675))
            ThreePointArc((-14.2959294395, -103.5329599675), (-14.6877393038, -102.9690649647), (-15.0573191219, -102.3903566598))
            Line((-15.0573191219, -102.3903566598), (-17.7063489474, -102.1542933171))
        make_face()
    extrude(amount=F3_DEPTH, both=True)


solid = Compound([f1.part, f2.part, f3.part, f3b.part, f3c.part, f3d.part, f3e.part, f3f.part, f3g.part, f3h.part])
